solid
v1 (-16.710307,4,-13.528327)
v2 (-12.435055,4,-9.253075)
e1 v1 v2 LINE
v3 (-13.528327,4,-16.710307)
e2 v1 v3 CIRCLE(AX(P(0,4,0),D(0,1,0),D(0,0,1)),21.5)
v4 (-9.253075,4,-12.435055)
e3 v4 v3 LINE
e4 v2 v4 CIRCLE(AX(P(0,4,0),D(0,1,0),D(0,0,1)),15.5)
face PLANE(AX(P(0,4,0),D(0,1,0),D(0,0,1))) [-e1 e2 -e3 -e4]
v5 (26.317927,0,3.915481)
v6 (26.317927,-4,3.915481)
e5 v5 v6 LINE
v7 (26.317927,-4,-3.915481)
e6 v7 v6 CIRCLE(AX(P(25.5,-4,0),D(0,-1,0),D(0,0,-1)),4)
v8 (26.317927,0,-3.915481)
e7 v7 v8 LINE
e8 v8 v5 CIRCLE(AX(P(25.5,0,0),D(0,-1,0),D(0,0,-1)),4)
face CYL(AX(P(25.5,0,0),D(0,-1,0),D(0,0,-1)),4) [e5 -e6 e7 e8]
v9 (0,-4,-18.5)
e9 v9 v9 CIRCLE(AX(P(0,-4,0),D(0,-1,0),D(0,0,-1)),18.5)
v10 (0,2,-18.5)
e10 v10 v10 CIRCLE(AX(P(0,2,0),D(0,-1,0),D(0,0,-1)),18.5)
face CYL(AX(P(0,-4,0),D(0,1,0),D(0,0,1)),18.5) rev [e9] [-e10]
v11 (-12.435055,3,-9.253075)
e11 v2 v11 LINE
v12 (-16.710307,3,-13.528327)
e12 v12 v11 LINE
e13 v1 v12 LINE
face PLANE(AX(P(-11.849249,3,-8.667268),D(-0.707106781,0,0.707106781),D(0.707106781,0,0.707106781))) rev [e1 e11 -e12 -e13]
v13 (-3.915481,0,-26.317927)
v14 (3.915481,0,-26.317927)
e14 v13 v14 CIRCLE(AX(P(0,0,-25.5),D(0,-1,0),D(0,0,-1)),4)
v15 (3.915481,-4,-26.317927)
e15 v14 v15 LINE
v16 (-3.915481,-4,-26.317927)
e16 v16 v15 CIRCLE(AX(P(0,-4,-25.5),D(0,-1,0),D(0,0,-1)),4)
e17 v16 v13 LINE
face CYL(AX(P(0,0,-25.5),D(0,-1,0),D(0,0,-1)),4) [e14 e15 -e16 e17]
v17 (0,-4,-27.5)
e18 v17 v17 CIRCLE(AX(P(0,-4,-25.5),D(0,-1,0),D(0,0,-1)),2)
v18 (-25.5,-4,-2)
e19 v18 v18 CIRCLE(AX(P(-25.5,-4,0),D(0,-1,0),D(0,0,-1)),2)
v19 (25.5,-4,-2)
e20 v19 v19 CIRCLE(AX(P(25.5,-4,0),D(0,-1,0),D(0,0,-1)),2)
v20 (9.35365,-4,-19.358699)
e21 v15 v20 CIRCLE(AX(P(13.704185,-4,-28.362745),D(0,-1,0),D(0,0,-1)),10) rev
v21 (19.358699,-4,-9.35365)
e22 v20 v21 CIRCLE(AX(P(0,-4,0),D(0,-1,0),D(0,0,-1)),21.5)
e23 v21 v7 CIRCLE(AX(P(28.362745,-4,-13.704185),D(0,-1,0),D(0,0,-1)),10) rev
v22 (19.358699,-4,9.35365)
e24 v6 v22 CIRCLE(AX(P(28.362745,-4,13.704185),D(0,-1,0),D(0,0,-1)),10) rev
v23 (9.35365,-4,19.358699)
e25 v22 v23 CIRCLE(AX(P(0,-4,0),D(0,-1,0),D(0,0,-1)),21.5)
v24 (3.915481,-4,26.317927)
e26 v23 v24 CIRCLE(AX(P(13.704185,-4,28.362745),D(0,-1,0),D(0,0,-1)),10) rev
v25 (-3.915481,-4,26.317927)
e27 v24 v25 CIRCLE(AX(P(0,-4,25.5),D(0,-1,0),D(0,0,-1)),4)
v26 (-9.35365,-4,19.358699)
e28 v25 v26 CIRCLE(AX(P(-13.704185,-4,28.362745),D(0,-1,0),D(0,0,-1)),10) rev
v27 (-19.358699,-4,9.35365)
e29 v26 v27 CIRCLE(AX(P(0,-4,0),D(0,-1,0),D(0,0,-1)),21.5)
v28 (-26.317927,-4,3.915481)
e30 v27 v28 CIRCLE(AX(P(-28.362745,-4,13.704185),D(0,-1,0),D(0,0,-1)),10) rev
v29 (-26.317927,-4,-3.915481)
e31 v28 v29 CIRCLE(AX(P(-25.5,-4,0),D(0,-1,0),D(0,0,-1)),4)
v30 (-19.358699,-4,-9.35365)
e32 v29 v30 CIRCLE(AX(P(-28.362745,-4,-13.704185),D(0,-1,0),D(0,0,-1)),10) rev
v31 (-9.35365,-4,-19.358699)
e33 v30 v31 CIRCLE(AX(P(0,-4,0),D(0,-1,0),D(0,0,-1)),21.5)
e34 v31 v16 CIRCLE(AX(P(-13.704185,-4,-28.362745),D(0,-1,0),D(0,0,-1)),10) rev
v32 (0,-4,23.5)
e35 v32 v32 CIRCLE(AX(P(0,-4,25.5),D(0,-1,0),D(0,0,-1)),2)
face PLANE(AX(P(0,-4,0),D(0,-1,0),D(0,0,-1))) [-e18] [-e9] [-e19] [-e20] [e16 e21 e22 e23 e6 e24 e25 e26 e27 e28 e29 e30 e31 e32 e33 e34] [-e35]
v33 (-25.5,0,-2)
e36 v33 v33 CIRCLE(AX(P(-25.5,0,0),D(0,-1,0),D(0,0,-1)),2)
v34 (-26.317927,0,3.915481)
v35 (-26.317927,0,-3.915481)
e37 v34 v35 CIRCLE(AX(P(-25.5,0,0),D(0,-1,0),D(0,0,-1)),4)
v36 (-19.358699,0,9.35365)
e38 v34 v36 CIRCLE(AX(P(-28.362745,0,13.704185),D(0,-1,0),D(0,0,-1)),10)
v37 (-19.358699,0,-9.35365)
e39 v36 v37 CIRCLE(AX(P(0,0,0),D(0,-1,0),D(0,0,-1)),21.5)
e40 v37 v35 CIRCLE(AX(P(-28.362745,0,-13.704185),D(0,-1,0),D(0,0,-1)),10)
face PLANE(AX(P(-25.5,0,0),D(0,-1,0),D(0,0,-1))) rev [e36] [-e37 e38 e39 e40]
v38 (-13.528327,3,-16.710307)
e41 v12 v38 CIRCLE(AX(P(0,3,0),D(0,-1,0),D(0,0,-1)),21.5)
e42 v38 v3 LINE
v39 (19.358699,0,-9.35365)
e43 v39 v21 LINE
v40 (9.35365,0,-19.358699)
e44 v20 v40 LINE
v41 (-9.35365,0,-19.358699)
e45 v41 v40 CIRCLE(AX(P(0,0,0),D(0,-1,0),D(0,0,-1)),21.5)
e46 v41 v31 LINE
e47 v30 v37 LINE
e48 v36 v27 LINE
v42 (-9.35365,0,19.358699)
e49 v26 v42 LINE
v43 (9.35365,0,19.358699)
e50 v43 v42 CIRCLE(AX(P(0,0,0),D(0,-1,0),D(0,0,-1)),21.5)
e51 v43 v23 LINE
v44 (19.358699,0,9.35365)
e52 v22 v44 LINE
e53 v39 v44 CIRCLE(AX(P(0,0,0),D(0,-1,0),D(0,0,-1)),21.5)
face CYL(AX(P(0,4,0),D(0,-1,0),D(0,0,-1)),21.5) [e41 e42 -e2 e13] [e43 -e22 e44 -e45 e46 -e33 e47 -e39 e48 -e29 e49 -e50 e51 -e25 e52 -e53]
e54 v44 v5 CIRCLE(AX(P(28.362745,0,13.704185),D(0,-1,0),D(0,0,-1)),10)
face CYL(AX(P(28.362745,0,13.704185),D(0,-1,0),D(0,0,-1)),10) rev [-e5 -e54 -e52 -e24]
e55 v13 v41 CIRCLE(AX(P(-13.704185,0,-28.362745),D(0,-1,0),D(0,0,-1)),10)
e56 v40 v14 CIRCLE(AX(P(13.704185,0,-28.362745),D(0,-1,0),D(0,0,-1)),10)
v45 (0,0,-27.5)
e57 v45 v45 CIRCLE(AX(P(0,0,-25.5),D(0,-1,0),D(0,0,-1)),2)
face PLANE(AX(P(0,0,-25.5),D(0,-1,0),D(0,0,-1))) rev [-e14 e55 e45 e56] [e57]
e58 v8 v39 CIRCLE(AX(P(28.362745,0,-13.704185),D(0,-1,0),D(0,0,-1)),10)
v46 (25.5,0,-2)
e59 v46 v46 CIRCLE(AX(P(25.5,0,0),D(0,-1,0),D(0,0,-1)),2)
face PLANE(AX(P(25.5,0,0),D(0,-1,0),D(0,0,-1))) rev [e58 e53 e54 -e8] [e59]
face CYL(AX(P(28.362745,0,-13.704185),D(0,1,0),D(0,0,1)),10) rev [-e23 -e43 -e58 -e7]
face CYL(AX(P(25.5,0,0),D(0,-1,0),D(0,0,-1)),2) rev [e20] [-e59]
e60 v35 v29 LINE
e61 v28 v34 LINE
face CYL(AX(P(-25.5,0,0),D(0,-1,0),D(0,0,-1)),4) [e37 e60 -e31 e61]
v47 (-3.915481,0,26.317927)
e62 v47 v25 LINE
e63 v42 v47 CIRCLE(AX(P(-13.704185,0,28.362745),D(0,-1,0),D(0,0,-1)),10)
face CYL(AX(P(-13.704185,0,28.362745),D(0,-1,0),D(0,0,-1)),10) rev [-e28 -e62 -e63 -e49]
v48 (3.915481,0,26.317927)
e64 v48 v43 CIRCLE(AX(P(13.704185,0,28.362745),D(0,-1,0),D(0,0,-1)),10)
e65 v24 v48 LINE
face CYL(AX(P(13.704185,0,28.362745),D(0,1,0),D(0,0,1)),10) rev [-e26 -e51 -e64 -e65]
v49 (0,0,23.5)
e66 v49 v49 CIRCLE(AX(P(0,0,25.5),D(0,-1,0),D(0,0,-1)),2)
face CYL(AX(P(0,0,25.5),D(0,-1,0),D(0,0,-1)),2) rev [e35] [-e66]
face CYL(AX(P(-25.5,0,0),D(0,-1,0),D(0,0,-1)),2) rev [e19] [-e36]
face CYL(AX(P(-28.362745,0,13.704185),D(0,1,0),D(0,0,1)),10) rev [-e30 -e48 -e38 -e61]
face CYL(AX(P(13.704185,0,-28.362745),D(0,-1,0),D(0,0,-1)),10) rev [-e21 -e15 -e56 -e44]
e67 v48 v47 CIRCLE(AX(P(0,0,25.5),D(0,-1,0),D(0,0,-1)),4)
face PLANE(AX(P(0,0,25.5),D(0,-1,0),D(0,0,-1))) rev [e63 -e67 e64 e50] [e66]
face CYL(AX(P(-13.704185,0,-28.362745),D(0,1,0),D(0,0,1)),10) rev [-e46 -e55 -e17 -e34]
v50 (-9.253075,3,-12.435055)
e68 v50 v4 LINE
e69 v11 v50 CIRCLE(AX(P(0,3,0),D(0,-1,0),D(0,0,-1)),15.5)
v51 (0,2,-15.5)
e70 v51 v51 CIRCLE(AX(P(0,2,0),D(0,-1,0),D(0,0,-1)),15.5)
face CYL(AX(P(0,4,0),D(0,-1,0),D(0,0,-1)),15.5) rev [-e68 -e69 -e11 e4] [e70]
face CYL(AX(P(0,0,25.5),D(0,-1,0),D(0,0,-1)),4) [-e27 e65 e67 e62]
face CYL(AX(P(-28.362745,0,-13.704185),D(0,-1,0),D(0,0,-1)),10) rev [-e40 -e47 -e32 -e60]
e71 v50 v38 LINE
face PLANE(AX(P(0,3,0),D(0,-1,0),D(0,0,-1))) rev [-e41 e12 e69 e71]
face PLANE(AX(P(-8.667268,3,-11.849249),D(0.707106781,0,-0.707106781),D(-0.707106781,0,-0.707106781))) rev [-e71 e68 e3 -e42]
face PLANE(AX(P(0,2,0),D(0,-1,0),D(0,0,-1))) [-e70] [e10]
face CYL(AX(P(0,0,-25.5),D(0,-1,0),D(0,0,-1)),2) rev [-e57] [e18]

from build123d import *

# Parameters (mm, degrees)
SKETCH1_R           = 21.5
SKETCH1_R_2         = 15.5
BOSS_EXTRUDE1_DEPTH = 4
BOSS_EXTRUDE2_START = 4
SKETCH2_R           = 21.5
SKETCH2_R_2         = 18.5
BOSS_EXTRUDE2_DEPTH = 4
SKETCH3_R           = 18.5
SKETCH3_R_2         = 15
CUT_EXTRUDE1_DEPTH  = 2
SKETCH4_R           = 2
BOSS_EXTRUDE3_DEPTH = 4
FILLET1_R           = 10
CUT_EXTRUDE3_DEPTH  = 1


with BuildPart() as part:
    # Sketch1 → Boss-Extrude1 (new body)
    with BuildSketch(Plane(origin=(0, 0, 0), x_dir=(1, 0, 0), z_dir=(0, 1, 0))):
        with Locations(Location((0, 0, 0), (0, 0, 270))):
            Circle(SKETCH1_R)
        with Locations(Location((0, 0, 0), (0, 0, 270))):
            Circle(SKETCH1_R_2, mode=Mode.SUBTRACT)
    extrude(amount=BOSS_EXTRUDE1_DEPTH)

    # Sketch2 → Boss-Extrude2 (add)
    with BuildSketch(Plane.XZ.offset(BOSS_EXTRUDE2_START)):
        with Locations(Location((0, 0, 0), (0, 0, 270))):
            Circle(SKETCH2_R)
        with Locations(Location((0, 0, 0), (0, 0, 270))):
            Circle(SKETCH2_R_2, mode=Mode.SUBTRACT)
    extrude(amount=-BOSS_EXTRUDE2_DEPTH)

    # Sketch3 → Cut-Extrude1 (cut)
    with BuildSketch(Plane.XZ):
        with Locations(Location((0, 0, 0), (0, 0, 270))):
            Circle(SKETCH3_R)
        Circle(SKETCH3_R_2, mode=Mode.SUBTRACT)
    extrude(amount=-CUT_EXTRUDE1_DEPTH, mode=Mode.SUBTRACT)

    # Sketch4 → Boss-Extrude3 (add)
    # profile 1 of 4: a face of its own
    with BuildSketch(Plane.XZ.offset(4)):
        with BuildLine():
            Line((-25.5, 4), (-20.187008248, 4))
            Line((-20.187008248, 4), (-20.187008248, -4))
            Line((-20.187008248, -4), (-25.5, -4))
            ThreePointArc((-25.5, -4), (-29.5, 0), (-25.5, 4))
        make_face()
        with Locations(Location((-25.5, 0, 0), (0, 0, 270))):
            Circle(SKETCH4_R, mode=Mode.SUBTRACT)
    # profile 2 of 4: a face of its own
    with BuildSketch(Plane.XZ.offset(4)):
        with BuildLine():
            Line((4, 20.187008248), (-4, 20.187008248))
            Line((-4, 20.187008248), (-4, 25.5))
            ThreePointArc((-4, 25.5), (0, 29.5), (4, 25.5))
            Line((4, 25.5), (4, 20.187008248))
        make_face()
        with Locations(Location((0, 25.5, 0), (0, 0, 270))):
            Circle(SKETCH4_R, mode=Mode.SUBTRACT)
    # profile 3 of 4: a face of its own
    with BuildSketch(Plane.XZ.offset(4)):
        with BuildLine():
            Line((20.187008248, -4), (20.187008248, 4))
            Line((20.187008248, 4), (25.5, 4))
            ThreePointArc((25.5, 4), (29.5, 0), (25.5, -4))
            Line((25.5, -4), (20.187008248, -4))
        make_face()
        with Locations(Location((25.5, 0, 0), (0, 0, 270))):
            Circle(SKETCH4_R, mode=Mode.SUBTRACT)
    # profile 4 of 4: a face of its own
    with BuildSketch(Plane.XZ.offset(4)):
        with BuildLine():
            Line((-4, -20.187008248), (4, -20.187008248))
            Line((4, -20.187008248), (4, -25.5))
            ThreePointArc((4, -25.5), (0, -29.5), (-4, -25.5))
            Line((-4, -25.5), (-4, -20.187008248))
        make_face()
        with Locations(Location((0, -25.5, 0), (0, 0, 270))):
            Circle(SKETCH4_R, mode=Mode.SUBTRACT)
    extrude(amount=-BOSS_EXTRUDE3_DEPTH)

    # Fillet1
    # the kernel refuses this fillet: 10 mm, written as the material it adds along each edge
    with BuildSketch(Plane(origin=(-4, 0, 21.124630174), x_dir=(0.016272387136782942, 0, 0.9998675959430181), z_dir=(0, -1, 0)), Plane(origin=(4, 0, -21.124630174), x_dir=(-0.01627238713686073, 0, -0.9998675959430169), z_dir=(0, -1, 0)), Plane(origin=(-21.124630174, 0, -4), x_dir=(-0.9998675959430171, 0, 0.01627238713684981), z_dir=(0, -1, 0)), Plane(origin=(21.124630174, 0, 4), x_dir=(0.9998675959430179, 0, -0.01627238713679413), z_dir=(0, -1, 0))) as fillet1_piece_1:
        with BuildLine():
            CenterArc((7.07924631, 9.82068168), FILLET1_R, 206.72107826, 52.41213662)
            Line((-1.852813991, 5.324205419), (-2.746020021, 4.874557792))
            ThreePointArc((-2.746020021, 4.874557792), (-1.695593605, 2.394427141), (-0.979383425, -0.202010165))
            Line((-0.979383425, -0.202010165), (0.016272387, -0.999867596))
            ThreePointArc((0.016272387, -0.999867596), (4.391062896, -0.928669884), (5.00545854, -0.982068168))
            Line((5.00545854, -0.982068168), (5.193984701, 0))
        make_face()
    extrude(amount=4)
    with BuildSketch(Plane(origin=(-21.124630174, 0, 4), x_dir=(-0.9998675959430171, 0, -0.016272387136849455), z_dir=(0, -1, 0)), Plane(origin=(-4, 0, -21.124630174), x_dir=(0.0162723871369052, 0, -0.9998675959430161), z_dir=(0, -1, 0)), Plane(origin=(21.124630174, 0, -4), x_dir=(0.9998675959430168, 0, 0.016272387136866445), z_dir=(0, -1, 0)), Plane(origin=(4, 0, 21.124630174), x_dir=(-0.0162723871368113, 0, 0.9998675959430178), z_dir=(0, -1, 0))) as fillet1_piece_2:
        with BuildLine():
            CenterArc((7.07924631, -9.82068168), FILLET1_R, 100.86678512, 52.41213662)
            Line((-1.852813991, -5.324205419), (-2.746020021, -4.874557792))
            ThreePointArc((-2.746020021, -4.874557792), (-1.695593605, -2.394427141), (-0.979383425, 0.202010165))
            Line((-0.979383425, 0.202010165), (0.016272387, 0.999867596))
            ThreePointArc((0.016272387, 0.999867596), (4.391062896, 0.928669884), (5.00545854, 0.982068168))
            Line((5.00545854, 0.982068168), (5.193984701, 0))
        make_face()
    extrude(amount=4)

    # Sketch6 → Cut-Extrude3 (cut)
    with BuildSketch(Plane(origin=(0, 4, 0), x_dir=(1, 0, 0), z_dir=(0, 1, 0))):
        Polygon((-8.667268163, 11.849248678), (-15.190647858, 18.372628373), (-18.372628373, 15.190647858), (-11.849248678, 8.667268163), align=None)
    extrude(amount=-CUT_EXTRUDE3_DEPTH, mode=Mode.SUBTRACT)


solid = part.part
